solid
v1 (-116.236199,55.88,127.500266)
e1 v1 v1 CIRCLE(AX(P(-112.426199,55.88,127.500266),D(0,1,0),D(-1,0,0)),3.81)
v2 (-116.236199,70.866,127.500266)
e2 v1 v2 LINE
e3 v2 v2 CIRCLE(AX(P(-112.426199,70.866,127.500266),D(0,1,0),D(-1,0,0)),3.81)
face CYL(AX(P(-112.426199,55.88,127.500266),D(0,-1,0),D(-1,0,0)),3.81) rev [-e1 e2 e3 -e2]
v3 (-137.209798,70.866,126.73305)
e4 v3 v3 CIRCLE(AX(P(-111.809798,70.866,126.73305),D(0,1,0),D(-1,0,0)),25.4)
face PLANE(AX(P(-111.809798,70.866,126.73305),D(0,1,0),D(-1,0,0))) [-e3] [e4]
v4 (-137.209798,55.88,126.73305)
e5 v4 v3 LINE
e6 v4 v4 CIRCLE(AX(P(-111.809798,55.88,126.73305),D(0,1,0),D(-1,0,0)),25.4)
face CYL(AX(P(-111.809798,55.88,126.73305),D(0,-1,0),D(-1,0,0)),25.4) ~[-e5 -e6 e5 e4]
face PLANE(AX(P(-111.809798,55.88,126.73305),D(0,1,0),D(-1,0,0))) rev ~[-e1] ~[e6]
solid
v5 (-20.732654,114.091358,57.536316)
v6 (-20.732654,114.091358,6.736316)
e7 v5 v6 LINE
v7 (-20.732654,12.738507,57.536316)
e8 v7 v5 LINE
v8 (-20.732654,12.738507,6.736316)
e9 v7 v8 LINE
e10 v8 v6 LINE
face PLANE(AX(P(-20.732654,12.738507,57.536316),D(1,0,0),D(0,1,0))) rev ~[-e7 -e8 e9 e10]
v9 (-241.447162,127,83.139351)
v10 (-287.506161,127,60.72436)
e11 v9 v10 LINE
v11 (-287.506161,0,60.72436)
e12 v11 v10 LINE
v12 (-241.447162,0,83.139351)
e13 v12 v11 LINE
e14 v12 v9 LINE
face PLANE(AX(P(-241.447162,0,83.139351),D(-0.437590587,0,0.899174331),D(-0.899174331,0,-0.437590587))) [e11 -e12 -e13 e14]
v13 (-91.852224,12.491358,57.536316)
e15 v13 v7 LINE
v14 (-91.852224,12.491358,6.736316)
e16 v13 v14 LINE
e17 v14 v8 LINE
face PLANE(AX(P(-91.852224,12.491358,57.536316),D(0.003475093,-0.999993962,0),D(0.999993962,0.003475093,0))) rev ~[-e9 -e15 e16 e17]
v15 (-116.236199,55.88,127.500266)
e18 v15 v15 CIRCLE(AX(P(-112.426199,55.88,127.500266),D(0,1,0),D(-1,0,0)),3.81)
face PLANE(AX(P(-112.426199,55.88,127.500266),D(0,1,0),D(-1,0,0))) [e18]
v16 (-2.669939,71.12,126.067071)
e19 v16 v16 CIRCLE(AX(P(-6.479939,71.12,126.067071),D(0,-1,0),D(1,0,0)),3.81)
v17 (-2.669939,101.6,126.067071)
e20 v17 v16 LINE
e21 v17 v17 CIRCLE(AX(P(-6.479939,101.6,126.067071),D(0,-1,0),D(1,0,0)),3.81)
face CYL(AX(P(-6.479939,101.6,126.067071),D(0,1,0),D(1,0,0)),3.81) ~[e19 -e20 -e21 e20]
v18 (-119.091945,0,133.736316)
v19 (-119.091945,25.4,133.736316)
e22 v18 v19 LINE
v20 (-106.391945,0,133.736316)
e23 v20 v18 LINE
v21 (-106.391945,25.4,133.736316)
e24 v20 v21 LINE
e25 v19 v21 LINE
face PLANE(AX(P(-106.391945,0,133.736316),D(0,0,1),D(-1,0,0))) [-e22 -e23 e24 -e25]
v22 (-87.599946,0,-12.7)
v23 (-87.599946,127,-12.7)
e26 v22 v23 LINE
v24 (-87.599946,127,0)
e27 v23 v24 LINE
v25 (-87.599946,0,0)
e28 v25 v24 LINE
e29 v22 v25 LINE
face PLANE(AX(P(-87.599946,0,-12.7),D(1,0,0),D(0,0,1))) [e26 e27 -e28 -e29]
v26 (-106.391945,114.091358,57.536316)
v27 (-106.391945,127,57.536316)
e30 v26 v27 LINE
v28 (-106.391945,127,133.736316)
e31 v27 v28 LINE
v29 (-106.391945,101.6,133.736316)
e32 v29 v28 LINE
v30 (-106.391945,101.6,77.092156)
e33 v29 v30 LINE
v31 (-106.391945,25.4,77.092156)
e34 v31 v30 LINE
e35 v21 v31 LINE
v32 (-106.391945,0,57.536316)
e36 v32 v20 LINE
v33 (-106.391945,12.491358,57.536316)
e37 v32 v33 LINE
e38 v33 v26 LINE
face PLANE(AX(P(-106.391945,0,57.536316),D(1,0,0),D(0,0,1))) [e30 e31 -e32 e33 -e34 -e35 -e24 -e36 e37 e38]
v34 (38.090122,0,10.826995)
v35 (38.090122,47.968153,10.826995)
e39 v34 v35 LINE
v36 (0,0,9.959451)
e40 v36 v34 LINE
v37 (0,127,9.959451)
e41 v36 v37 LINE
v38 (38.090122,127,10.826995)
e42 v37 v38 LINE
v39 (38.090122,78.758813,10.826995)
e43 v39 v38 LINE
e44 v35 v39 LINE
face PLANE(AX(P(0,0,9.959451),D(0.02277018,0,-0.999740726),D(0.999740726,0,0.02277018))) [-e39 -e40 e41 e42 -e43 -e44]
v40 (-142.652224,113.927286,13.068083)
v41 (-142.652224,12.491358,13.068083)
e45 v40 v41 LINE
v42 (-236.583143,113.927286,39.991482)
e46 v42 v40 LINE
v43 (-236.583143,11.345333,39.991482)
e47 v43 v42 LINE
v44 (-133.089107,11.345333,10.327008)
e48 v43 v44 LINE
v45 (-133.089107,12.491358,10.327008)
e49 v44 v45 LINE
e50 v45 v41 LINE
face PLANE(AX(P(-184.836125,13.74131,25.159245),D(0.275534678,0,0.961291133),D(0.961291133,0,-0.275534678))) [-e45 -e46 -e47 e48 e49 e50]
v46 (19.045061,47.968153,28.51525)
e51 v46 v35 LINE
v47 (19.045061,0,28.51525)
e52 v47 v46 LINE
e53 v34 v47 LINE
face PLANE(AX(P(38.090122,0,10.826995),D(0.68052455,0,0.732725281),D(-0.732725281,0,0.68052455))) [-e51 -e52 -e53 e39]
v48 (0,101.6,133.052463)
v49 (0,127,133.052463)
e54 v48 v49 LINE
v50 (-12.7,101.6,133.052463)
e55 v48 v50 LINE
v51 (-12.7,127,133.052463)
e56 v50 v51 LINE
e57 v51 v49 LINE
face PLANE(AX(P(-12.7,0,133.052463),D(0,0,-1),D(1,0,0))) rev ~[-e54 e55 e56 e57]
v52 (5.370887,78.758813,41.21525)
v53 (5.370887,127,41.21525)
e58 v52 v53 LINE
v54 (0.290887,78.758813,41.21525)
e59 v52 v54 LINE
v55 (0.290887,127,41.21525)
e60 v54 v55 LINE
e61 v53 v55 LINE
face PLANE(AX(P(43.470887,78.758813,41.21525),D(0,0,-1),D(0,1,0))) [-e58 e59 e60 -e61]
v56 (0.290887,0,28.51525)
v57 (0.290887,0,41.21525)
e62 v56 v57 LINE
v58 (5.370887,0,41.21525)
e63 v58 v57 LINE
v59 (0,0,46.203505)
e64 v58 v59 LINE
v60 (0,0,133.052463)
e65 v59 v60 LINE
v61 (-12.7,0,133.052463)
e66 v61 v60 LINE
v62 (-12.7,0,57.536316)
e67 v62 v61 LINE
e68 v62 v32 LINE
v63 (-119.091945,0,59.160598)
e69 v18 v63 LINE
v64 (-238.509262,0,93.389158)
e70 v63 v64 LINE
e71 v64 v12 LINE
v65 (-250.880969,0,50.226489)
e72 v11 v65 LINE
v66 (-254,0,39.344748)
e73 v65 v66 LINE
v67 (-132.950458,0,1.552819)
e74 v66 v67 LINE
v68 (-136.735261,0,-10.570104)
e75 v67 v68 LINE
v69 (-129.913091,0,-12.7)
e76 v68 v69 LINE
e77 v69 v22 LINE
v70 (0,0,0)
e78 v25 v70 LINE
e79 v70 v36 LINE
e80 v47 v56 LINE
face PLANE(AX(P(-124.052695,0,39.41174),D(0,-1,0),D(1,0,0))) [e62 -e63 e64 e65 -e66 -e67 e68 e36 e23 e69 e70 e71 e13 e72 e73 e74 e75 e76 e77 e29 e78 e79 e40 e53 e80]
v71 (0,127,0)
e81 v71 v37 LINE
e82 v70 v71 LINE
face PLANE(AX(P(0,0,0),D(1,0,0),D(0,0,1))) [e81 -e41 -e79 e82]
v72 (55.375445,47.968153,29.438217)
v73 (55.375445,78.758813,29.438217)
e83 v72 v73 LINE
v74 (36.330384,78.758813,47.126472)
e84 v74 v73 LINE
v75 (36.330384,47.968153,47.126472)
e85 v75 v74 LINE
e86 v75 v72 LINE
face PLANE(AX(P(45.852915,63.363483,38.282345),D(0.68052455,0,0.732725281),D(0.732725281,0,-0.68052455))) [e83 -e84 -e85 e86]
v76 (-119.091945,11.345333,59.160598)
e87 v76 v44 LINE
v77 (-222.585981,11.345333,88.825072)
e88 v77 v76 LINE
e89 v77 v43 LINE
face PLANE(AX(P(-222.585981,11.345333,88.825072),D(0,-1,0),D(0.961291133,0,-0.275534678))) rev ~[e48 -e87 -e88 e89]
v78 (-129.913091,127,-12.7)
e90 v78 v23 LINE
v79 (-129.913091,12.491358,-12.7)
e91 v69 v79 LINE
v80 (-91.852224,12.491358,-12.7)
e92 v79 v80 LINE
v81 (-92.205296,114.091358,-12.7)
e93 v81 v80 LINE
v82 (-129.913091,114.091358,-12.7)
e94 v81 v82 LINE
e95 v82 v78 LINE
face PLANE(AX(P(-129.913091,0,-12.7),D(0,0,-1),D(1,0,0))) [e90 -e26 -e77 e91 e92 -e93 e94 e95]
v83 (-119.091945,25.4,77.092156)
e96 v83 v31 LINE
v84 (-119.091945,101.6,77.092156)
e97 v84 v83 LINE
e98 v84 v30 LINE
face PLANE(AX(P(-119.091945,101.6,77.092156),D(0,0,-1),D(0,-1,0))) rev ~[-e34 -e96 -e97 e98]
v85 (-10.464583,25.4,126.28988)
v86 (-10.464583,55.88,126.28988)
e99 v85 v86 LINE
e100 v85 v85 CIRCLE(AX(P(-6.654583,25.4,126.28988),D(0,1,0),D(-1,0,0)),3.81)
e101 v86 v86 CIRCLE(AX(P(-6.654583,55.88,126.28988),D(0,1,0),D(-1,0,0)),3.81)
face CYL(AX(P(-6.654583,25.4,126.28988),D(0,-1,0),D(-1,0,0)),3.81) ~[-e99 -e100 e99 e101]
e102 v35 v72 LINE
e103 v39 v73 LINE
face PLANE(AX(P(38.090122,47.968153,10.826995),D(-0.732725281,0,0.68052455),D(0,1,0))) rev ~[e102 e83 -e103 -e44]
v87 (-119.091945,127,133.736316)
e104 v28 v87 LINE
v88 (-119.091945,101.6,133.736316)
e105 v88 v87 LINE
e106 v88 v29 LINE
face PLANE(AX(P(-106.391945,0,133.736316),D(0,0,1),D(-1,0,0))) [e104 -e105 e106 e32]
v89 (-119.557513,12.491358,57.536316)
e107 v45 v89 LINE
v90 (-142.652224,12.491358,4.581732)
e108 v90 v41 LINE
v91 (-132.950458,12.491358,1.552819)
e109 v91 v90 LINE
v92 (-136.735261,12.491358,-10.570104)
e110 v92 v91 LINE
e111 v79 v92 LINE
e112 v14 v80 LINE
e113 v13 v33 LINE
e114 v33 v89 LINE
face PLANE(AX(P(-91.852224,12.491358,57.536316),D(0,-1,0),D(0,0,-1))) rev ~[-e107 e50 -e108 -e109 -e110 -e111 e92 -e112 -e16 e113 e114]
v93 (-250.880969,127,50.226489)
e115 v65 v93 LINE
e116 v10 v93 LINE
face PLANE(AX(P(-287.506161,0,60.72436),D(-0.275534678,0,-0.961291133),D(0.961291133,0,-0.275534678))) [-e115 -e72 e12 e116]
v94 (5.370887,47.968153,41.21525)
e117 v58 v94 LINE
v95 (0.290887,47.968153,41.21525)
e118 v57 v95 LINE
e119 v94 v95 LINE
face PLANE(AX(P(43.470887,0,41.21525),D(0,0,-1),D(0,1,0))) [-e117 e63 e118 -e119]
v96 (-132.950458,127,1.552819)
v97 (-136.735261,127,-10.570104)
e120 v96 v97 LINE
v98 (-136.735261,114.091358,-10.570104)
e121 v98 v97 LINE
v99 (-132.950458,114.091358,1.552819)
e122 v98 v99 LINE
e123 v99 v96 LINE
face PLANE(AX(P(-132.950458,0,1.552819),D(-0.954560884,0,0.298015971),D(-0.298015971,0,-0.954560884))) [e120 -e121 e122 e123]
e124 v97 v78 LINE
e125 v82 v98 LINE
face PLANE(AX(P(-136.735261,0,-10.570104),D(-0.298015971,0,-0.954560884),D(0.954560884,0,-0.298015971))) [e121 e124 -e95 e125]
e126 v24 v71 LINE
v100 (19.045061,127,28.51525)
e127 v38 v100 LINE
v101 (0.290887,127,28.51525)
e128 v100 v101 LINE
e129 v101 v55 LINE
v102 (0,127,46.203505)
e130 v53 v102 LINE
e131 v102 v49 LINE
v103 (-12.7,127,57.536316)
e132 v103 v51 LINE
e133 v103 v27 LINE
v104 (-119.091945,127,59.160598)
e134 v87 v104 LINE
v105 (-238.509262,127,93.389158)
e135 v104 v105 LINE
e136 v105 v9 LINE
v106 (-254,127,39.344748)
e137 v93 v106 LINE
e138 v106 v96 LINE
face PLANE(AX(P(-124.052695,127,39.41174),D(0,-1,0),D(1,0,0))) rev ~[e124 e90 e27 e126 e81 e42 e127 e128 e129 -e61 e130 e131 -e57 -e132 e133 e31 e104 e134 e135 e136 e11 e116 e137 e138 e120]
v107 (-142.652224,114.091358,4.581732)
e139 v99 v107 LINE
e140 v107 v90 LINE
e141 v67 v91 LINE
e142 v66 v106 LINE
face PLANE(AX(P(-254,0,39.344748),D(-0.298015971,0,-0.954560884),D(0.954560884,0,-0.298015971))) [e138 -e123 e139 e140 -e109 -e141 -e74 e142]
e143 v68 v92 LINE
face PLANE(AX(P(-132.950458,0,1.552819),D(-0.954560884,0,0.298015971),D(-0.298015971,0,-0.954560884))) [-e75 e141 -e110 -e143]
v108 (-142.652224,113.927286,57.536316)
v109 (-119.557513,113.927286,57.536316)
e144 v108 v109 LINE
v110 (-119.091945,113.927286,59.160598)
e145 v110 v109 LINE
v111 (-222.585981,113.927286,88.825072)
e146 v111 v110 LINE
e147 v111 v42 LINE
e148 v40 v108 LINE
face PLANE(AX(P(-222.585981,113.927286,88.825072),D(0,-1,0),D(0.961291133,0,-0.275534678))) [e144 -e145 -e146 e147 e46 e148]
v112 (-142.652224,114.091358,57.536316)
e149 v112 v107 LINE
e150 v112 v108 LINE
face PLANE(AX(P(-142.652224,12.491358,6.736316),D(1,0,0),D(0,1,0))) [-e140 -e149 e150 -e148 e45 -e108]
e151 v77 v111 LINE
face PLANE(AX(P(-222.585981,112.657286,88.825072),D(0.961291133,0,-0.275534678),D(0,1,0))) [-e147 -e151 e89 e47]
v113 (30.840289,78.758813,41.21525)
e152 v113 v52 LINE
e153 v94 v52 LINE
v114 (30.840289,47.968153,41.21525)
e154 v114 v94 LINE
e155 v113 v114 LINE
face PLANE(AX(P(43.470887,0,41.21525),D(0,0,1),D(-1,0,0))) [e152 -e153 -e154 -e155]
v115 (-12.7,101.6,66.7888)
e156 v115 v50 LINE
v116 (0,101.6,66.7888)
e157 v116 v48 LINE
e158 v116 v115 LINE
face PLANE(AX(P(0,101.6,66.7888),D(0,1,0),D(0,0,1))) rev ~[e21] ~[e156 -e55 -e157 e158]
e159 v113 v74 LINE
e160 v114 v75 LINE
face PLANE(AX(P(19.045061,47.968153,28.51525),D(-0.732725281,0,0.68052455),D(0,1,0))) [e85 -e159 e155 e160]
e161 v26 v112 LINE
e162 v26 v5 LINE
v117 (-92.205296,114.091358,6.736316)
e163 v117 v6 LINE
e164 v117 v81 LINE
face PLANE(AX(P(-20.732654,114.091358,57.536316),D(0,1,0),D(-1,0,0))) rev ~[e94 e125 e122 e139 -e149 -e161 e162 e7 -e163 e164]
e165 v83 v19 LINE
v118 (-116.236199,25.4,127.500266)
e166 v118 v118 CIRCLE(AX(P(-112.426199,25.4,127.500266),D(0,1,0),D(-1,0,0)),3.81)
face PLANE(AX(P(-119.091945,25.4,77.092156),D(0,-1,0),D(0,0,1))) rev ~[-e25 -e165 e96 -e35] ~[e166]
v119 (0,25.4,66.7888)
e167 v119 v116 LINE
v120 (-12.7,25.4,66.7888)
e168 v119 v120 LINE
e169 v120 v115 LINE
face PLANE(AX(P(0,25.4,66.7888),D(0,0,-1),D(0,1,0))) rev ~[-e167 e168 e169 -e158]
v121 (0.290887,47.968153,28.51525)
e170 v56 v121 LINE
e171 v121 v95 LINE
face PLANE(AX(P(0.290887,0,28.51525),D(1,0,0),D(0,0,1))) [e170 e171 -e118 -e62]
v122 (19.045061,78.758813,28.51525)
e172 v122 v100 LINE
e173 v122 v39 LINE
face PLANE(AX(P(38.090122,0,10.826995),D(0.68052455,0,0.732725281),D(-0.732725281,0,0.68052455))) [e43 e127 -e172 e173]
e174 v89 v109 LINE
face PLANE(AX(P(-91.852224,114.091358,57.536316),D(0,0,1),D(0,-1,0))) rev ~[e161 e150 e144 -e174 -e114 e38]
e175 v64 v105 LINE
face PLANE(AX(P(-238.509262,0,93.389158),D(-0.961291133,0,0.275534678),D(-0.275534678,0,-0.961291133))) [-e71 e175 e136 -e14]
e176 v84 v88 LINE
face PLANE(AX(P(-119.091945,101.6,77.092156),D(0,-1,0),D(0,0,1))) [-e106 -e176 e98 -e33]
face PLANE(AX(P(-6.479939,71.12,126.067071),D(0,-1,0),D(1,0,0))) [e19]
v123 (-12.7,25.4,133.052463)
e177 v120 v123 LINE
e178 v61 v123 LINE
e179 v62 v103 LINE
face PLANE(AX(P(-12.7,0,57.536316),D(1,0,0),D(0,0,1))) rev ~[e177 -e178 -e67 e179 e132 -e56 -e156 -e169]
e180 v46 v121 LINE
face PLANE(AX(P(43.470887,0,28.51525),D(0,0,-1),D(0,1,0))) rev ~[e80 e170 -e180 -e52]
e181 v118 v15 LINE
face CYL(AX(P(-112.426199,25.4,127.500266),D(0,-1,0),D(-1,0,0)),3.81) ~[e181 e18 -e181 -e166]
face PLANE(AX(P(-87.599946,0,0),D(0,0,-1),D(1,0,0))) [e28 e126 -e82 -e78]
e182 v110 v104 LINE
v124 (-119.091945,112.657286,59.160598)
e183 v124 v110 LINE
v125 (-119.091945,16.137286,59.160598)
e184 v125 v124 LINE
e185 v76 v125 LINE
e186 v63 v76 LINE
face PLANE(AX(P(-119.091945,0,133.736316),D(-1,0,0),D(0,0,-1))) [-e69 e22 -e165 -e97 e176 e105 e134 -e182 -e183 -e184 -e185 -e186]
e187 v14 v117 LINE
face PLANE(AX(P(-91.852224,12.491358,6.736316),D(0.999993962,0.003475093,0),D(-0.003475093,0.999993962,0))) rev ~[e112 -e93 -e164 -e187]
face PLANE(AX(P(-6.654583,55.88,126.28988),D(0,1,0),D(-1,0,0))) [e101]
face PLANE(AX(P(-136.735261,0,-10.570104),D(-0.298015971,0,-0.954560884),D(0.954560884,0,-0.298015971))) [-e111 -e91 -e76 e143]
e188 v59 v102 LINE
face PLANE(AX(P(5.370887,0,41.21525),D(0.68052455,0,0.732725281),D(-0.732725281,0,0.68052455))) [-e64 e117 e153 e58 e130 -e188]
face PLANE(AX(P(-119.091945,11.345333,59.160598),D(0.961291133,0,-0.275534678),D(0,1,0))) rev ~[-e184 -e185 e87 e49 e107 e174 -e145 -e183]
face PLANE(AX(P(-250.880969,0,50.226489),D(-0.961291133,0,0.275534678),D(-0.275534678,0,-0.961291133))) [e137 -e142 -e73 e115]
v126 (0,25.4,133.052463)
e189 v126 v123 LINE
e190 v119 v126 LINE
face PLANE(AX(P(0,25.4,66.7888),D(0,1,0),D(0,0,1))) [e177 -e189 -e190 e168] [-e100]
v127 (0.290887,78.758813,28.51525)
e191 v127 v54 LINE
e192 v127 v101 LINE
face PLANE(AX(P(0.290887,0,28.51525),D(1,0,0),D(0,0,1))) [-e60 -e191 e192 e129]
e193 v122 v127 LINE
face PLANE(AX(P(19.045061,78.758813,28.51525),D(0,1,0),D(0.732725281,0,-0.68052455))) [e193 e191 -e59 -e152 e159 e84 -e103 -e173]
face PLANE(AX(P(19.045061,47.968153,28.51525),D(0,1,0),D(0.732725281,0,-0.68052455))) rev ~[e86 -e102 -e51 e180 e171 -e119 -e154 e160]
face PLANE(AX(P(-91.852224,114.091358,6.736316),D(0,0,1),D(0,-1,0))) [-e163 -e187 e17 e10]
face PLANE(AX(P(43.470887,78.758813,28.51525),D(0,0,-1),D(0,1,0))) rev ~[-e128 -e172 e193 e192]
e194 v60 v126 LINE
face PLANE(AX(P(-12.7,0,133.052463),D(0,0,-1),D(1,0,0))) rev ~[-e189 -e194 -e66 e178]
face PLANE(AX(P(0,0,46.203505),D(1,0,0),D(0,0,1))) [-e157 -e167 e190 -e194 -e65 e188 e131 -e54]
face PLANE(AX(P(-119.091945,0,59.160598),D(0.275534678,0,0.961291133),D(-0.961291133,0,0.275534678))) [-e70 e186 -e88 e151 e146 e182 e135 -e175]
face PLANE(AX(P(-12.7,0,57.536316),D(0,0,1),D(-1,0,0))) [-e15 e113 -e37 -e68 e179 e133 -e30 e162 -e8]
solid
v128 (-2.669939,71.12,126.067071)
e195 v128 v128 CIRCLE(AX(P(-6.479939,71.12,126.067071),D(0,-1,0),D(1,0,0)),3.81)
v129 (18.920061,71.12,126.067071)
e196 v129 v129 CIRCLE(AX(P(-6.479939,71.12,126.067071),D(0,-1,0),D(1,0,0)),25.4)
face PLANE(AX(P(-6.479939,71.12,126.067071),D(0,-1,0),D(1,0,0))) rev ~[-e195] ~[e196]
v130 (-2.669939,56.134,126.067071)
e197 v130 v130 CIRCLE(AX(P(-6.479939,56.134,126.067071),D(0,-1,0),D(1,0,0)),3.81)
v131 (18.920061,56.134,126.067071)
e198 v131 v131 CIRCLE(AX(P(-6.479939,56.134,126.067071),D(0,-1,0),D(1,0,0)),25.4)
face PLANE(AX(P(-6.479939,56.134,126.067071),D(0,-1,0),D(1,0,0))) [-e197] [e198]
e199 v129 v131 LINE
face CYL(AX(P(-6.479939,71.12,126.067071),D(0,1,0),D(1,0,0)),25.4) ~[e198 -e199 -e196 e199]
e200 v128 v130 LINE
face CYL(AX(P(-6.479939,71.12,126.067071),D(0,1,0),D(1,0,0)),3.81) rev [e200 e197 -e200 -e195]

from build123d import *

# Parameters (mm, degrees)
F0_W      = 12.7
F0_H      = 75.5161463809
F1_DEPTH  = 127
F2_W      = 76.2
F2_H      = 66.2636627701
F3_DEPTH  = 25.4
F4_W      = 76.2
F4_H      = 56.6441606358
F5_DEPTH  = 25.4
F7_DEPTH  = 50.8
F8_W      = 91.44
F8_H      = 96.52
F9_DEPTH  = 50.8
F10_DEPTH = 50.8
F11_DEPTH = 25.4
F12_W     = 16.2214900825
F12_H     = 96.52
F13_DEPTH = 25.4
F14_W     = 107.6614900825
F14_H     = 4.7919526836
F15_DEPTH = 50.8
F16_W     = 107.6614900825
F16_H     = 1.27
F17_DEPTH = 50.8
F18_W     = 25.4
F18_H     = 101.6
F19_DEPTH = 50.8
F21_DEPTH = 50.8
F22_W     = 25.9920891664
F22_H     = 30.7906605303
F23_DEPTH = 50.8
F24_DEPTH = 43.18
F25_DEPTH = 25.4
F26_R     = 3.81
F27_DEPTH = 30.48
F28_R     = 3.81
F29_DEPTH = 30.48
F30_R     = 25.4
F30_R_2   = 3.81
F31_DEPTH = 14.986
F34_R     = 3.81
F35_DEPTH = 30.48
F36_R     = 25.4
F36_R_2   = 3.81
F37_DEPTH = 14.986


# Not quite as in the source:
# - the program builds the solid bodies; features that only make, move or delete a surface that nothing else refers to are left out


with BuildPart() as f1:
    # F0 (on Front) → F1 (new body)
    with BuildSketch(Plane.XZ):
        Polygon((-87.5999455111, 0), (0, 0), (0, 9.9594512863), (0, 46.2035047115), (0, 57.53631645), (-12.7, 57.53631645), (-106.3919453168, 57.53631645), (-113.4251185967, 57.53631645), (-119.0919453168, 59.1605978149), (-238.5092618621, 93.3891584363), (-241.4471621132, 83.1393507349), (-250.8809689206, 50.2264886893), (-254, 39.3447479744), (-132.9504583663, 1.5528194825), (-127.9766956054, 0), align=None)
        Polygon((-287.50616107, 60.7243599029), (-250.8809689206, 50.2264886893), (-241.4471621132, 83.1393507349), align=None)
        Polygon((-87.5999455111, -12.7), (-87.5999455111, 0), (-127.9766956054, 0), (-132.9504583663, 1.5528194825), (-136.7352611956, -10.5701037435), (-129.9130910692, -12.7), align=None)
        Polygon((-113.4251185967, 57.53631645), (-106.3919453168, 57.53631645), (-106.3919453168, 133.73631645), (-119.0919453168, 133.73631645), (-119.0919453168, 59.1605978149), align=None)
        with Locations((-6.35, 95.2943896404)):
            Rectangle(F0_W, F0_H)
        Polygon((43.4708868936, 41.215249927), (5.3708868936, 41.215249927), (19.0450608273, 28.515249927), (43.4708868936, 28.515249927), align=None)
        Polygon((0, 46.2035047115), (0, 9.9594512863), (38.0901216545, 10.8269951425), (19.0450608273, 28.515249927), (5.3708868936, 41.215249927), align=None)
    extrude(amount=-F1_DEPTH)

    # F2 (on face) → F3 (cut)
    with BuildSketch(Plane.YZ):
        with Locations((63.5, 99.9206314458)):
            Rectangle(F2_W, F2_H)
    extrude(amount=-F3_DEPTH, mode=Mode.SUBTRACT)

    # F4 (on face) → F5 (cut)
    with BuildSketch(Plane(origin=(-119.0919453168, 0, 0), x_dir=(0, -1, 0), z_dir=(-1, 0, 0))):
        with Locations((-63.5, 105.4142361321)):
            Rectangle(F4_W, F4_H)
    extrude(amount=-F5_DEPTH, mode=Mode.SUBTRACT)

    # F6 (on face) → F7 (cut)
    with BuildSketch(Plane.XY.offset(57.53631645)):
        Polygon((-20.7326539246, 114.0913581697), (-91.852224491, 114.0913581697), (-91.852224491, 12.4913581697), (-20.7326539246, 12.7385068121), align=None)
    extrude(amount=-F7_DEPTH, mode=Mode.SUBTRACT)

    # F8 (on face) → F9 (cut)
    with BuildSketch(Plane(origin=(6.6284267866, 0, 23.125393689), x_dir=(0.9612911325, 0, -0.2755346775), z_dir=(0.2755346775, 0, 0.9612911325))):
        with Locations((-192.7243173122, 64.3972861033)):
            Rectangle(F8_W, F8_H)
    extrude(amount=-F9_DEPTH, mode=Mode.SUBTRACT)

    # F10 (cut): a face of the model
    f10_faces = [f1.faces().sort_by_distance(p)[0] for p in [
        (-91.852224491, 63.2913581697, 32.13631645),
    ]]
    extrude(f10_faces, amount=-F10_DEPTH, mode=Mode.SUBTRACT)

    # F11 (cut): a face of the model
    f11_faces = [f1.faces().sort_by_distance(p)[0] for p in [
        (-145.6674529992, 64.3972861033, 25.3161834597),
    ]]
    extrude(f11_faces, amount=-F11_DEPTH, mode=Mode.SUBTRACT)

    # F12 (on face) → F13 (cut)
    with BuildSketch(Plane(origin=(6.6284267866, 0, 23.125393689), x_dir=(0.9612911325, 0, -0.2755346775), z_dir=(0.2755346775, 0, 0.9612911325))):
        with Locations((-138.893572271, 64.3972861033)):
            Rectangle(F12_W, F12_H)
    extrude(amount=-F13_DEPTH, mode=Mode.SUBTRACT)

    # F14 (on face) → F15 (cut)
    with BuildSketch(Plane(origin=(6.6284267866, 0, 23.125393689), x_dir=(0.9612911325, 0, -0.2755346775), z_dir=(0.2755346775, 0, 0.9612911325))):
        with Locations((-184.613572271, 13.7413097615)):
            Rectangle(F14_W, F14_H)
    extrude(amount=-F15_DEPTH, mode=Mode.SUBTRACT)

    # F16 (on face) → F17 (cut)
    with BuildSketch(Plane(origin=(6.6284267866, 0, 23.125393689), x_dir=(0.9612911325, 0, -0.2755346775), z_dir=(0.2755346775, 0, 0.9612911325))):
        with Locations((-184.613572271, 113.2922861033)):
            Rectangle(F16_W, F16_H)
    extrude(amount=-F17_DEPTH, mode=Mode.SUBTRACT)

    # F18 (on face) → F19 (cut)
    with BuildSketch(Plane.XY.offset(6.73631645)):
        with Locations((-129.952224491, 63.2913581697)):
            Rectangle(F18_W, F18_H)
    extrude(amount=-F19_DEPTH, mode=Mode.SUBTRACT)

    # F20 (on face) → F21 (cut)
    with BuildSketch(Plane.XY.offset(6.73631645)):
        Polygon((-117.252224491, 12.4913581697), (-104.552224491, 12.4913581697), (-91.852224491, 12.4913581697), (-92.2052961121, 114.0913581697), (-117.252224491, 114.0913581697), align=None)
    extrude(amount=-F21_DEPTH, mode=Mode.SUBTRACT)

    # F22 (on face) → F23 (join)
    with BuildSketch(Plane(origin=(23.0388020149, 0, 24.8060303918), x_dir=(0.7327252806, 0, -0.68052455), z_dir=(0.68052455, 0, 0.7327252806))):
        with Locations((7.5455144958, 63.3634831756)):
            Rectangle(F22_W, F22_H)
    extrude(amount=F23_DEPTH)

    # F24 (cut): faces of the model
    f24_faces = [f1.faces().sort_by_distance(p)[0] for p in [
        (43.4708868936, 23.9840764552, 34.865249927),
        (43.4708868936, 102.8794067204, 34.865249927),
    ]]
    extrude(f24_faces, amount=-F24_DEPTH, mode=Mode.SUBTRACT)

    # F25 (cut): a face of the model
    f25_faces = [f1.faces().sort_by_distance(p)[0] for p in [
        (63.1382383827, 63.3634831756, 56.8935667881),
    ]]
    extrude(f25_faces, amount=-F25_DEPTH, mode=Mode.SUBTRACT)

    # F26 (on face) → F27 (join)
    with BuildSketch(Plane.XZ.offset(-101.6)):
        with Locations((-6.4799388689, 126.0670712375)):
            Circle(F26_R)
    extrude(amount=F27_DEPTH)

    # F28 (on face) → F29 (join)
    with BuildSketch(Plane(origin=(0, 25.4, 0), x_dir=(-1, 0, 0), z_dir=(0, 1, 0))):
        with Locations((6.6545831251, 126.2898803812)):
            Circle(F28_R)
    extrude(amount=F29_DEPTH)

    # F34 (on face) → F35 (join)
    with BuildSketch(Plane(origin=(0, 25.4, 0), x_dir=(-1, 0, 0), z_dir=(0, 1, 0))):
        with Locations((112.426199019, 127.5002658367)):
            Circle(F34_R)
    extrude(amount=F35_DEPTH)


with BuildPart() as f31:
    # F30 (on face) → F31 (new body)
    with BuildSketch(Plane.XZ.offset(-71.12)):
        with Locations((-6.4799388689, 126.0670712375)):
            Circle(F30_R)
        with Locations((-6.4799388689, 126.0670712375)):
            Circle(F30_R_2, mode=Mode.SUBTRACT)
    extrude(amount=F31_DEPTH)


with BuildPart() as f37:
    # F36 (on face) → F37 (new body)
    with BuildSketch(Plane(origin=(0, 55.88, 0), x_dir=(-1, 0, 0), z_dir=(0, 1, 0))):
        with Locations((111.809797585, 126.7330497503)):
            Circle(F36_R)
        with Locations((112.426199019, 127.5002658367)):
            Circle(F36_R_2, mode=Mode.SUBTRACT)
    extrude(amount=F37_DEPTH)


solid = Compound([f1.part, f31.part, f37.part])
